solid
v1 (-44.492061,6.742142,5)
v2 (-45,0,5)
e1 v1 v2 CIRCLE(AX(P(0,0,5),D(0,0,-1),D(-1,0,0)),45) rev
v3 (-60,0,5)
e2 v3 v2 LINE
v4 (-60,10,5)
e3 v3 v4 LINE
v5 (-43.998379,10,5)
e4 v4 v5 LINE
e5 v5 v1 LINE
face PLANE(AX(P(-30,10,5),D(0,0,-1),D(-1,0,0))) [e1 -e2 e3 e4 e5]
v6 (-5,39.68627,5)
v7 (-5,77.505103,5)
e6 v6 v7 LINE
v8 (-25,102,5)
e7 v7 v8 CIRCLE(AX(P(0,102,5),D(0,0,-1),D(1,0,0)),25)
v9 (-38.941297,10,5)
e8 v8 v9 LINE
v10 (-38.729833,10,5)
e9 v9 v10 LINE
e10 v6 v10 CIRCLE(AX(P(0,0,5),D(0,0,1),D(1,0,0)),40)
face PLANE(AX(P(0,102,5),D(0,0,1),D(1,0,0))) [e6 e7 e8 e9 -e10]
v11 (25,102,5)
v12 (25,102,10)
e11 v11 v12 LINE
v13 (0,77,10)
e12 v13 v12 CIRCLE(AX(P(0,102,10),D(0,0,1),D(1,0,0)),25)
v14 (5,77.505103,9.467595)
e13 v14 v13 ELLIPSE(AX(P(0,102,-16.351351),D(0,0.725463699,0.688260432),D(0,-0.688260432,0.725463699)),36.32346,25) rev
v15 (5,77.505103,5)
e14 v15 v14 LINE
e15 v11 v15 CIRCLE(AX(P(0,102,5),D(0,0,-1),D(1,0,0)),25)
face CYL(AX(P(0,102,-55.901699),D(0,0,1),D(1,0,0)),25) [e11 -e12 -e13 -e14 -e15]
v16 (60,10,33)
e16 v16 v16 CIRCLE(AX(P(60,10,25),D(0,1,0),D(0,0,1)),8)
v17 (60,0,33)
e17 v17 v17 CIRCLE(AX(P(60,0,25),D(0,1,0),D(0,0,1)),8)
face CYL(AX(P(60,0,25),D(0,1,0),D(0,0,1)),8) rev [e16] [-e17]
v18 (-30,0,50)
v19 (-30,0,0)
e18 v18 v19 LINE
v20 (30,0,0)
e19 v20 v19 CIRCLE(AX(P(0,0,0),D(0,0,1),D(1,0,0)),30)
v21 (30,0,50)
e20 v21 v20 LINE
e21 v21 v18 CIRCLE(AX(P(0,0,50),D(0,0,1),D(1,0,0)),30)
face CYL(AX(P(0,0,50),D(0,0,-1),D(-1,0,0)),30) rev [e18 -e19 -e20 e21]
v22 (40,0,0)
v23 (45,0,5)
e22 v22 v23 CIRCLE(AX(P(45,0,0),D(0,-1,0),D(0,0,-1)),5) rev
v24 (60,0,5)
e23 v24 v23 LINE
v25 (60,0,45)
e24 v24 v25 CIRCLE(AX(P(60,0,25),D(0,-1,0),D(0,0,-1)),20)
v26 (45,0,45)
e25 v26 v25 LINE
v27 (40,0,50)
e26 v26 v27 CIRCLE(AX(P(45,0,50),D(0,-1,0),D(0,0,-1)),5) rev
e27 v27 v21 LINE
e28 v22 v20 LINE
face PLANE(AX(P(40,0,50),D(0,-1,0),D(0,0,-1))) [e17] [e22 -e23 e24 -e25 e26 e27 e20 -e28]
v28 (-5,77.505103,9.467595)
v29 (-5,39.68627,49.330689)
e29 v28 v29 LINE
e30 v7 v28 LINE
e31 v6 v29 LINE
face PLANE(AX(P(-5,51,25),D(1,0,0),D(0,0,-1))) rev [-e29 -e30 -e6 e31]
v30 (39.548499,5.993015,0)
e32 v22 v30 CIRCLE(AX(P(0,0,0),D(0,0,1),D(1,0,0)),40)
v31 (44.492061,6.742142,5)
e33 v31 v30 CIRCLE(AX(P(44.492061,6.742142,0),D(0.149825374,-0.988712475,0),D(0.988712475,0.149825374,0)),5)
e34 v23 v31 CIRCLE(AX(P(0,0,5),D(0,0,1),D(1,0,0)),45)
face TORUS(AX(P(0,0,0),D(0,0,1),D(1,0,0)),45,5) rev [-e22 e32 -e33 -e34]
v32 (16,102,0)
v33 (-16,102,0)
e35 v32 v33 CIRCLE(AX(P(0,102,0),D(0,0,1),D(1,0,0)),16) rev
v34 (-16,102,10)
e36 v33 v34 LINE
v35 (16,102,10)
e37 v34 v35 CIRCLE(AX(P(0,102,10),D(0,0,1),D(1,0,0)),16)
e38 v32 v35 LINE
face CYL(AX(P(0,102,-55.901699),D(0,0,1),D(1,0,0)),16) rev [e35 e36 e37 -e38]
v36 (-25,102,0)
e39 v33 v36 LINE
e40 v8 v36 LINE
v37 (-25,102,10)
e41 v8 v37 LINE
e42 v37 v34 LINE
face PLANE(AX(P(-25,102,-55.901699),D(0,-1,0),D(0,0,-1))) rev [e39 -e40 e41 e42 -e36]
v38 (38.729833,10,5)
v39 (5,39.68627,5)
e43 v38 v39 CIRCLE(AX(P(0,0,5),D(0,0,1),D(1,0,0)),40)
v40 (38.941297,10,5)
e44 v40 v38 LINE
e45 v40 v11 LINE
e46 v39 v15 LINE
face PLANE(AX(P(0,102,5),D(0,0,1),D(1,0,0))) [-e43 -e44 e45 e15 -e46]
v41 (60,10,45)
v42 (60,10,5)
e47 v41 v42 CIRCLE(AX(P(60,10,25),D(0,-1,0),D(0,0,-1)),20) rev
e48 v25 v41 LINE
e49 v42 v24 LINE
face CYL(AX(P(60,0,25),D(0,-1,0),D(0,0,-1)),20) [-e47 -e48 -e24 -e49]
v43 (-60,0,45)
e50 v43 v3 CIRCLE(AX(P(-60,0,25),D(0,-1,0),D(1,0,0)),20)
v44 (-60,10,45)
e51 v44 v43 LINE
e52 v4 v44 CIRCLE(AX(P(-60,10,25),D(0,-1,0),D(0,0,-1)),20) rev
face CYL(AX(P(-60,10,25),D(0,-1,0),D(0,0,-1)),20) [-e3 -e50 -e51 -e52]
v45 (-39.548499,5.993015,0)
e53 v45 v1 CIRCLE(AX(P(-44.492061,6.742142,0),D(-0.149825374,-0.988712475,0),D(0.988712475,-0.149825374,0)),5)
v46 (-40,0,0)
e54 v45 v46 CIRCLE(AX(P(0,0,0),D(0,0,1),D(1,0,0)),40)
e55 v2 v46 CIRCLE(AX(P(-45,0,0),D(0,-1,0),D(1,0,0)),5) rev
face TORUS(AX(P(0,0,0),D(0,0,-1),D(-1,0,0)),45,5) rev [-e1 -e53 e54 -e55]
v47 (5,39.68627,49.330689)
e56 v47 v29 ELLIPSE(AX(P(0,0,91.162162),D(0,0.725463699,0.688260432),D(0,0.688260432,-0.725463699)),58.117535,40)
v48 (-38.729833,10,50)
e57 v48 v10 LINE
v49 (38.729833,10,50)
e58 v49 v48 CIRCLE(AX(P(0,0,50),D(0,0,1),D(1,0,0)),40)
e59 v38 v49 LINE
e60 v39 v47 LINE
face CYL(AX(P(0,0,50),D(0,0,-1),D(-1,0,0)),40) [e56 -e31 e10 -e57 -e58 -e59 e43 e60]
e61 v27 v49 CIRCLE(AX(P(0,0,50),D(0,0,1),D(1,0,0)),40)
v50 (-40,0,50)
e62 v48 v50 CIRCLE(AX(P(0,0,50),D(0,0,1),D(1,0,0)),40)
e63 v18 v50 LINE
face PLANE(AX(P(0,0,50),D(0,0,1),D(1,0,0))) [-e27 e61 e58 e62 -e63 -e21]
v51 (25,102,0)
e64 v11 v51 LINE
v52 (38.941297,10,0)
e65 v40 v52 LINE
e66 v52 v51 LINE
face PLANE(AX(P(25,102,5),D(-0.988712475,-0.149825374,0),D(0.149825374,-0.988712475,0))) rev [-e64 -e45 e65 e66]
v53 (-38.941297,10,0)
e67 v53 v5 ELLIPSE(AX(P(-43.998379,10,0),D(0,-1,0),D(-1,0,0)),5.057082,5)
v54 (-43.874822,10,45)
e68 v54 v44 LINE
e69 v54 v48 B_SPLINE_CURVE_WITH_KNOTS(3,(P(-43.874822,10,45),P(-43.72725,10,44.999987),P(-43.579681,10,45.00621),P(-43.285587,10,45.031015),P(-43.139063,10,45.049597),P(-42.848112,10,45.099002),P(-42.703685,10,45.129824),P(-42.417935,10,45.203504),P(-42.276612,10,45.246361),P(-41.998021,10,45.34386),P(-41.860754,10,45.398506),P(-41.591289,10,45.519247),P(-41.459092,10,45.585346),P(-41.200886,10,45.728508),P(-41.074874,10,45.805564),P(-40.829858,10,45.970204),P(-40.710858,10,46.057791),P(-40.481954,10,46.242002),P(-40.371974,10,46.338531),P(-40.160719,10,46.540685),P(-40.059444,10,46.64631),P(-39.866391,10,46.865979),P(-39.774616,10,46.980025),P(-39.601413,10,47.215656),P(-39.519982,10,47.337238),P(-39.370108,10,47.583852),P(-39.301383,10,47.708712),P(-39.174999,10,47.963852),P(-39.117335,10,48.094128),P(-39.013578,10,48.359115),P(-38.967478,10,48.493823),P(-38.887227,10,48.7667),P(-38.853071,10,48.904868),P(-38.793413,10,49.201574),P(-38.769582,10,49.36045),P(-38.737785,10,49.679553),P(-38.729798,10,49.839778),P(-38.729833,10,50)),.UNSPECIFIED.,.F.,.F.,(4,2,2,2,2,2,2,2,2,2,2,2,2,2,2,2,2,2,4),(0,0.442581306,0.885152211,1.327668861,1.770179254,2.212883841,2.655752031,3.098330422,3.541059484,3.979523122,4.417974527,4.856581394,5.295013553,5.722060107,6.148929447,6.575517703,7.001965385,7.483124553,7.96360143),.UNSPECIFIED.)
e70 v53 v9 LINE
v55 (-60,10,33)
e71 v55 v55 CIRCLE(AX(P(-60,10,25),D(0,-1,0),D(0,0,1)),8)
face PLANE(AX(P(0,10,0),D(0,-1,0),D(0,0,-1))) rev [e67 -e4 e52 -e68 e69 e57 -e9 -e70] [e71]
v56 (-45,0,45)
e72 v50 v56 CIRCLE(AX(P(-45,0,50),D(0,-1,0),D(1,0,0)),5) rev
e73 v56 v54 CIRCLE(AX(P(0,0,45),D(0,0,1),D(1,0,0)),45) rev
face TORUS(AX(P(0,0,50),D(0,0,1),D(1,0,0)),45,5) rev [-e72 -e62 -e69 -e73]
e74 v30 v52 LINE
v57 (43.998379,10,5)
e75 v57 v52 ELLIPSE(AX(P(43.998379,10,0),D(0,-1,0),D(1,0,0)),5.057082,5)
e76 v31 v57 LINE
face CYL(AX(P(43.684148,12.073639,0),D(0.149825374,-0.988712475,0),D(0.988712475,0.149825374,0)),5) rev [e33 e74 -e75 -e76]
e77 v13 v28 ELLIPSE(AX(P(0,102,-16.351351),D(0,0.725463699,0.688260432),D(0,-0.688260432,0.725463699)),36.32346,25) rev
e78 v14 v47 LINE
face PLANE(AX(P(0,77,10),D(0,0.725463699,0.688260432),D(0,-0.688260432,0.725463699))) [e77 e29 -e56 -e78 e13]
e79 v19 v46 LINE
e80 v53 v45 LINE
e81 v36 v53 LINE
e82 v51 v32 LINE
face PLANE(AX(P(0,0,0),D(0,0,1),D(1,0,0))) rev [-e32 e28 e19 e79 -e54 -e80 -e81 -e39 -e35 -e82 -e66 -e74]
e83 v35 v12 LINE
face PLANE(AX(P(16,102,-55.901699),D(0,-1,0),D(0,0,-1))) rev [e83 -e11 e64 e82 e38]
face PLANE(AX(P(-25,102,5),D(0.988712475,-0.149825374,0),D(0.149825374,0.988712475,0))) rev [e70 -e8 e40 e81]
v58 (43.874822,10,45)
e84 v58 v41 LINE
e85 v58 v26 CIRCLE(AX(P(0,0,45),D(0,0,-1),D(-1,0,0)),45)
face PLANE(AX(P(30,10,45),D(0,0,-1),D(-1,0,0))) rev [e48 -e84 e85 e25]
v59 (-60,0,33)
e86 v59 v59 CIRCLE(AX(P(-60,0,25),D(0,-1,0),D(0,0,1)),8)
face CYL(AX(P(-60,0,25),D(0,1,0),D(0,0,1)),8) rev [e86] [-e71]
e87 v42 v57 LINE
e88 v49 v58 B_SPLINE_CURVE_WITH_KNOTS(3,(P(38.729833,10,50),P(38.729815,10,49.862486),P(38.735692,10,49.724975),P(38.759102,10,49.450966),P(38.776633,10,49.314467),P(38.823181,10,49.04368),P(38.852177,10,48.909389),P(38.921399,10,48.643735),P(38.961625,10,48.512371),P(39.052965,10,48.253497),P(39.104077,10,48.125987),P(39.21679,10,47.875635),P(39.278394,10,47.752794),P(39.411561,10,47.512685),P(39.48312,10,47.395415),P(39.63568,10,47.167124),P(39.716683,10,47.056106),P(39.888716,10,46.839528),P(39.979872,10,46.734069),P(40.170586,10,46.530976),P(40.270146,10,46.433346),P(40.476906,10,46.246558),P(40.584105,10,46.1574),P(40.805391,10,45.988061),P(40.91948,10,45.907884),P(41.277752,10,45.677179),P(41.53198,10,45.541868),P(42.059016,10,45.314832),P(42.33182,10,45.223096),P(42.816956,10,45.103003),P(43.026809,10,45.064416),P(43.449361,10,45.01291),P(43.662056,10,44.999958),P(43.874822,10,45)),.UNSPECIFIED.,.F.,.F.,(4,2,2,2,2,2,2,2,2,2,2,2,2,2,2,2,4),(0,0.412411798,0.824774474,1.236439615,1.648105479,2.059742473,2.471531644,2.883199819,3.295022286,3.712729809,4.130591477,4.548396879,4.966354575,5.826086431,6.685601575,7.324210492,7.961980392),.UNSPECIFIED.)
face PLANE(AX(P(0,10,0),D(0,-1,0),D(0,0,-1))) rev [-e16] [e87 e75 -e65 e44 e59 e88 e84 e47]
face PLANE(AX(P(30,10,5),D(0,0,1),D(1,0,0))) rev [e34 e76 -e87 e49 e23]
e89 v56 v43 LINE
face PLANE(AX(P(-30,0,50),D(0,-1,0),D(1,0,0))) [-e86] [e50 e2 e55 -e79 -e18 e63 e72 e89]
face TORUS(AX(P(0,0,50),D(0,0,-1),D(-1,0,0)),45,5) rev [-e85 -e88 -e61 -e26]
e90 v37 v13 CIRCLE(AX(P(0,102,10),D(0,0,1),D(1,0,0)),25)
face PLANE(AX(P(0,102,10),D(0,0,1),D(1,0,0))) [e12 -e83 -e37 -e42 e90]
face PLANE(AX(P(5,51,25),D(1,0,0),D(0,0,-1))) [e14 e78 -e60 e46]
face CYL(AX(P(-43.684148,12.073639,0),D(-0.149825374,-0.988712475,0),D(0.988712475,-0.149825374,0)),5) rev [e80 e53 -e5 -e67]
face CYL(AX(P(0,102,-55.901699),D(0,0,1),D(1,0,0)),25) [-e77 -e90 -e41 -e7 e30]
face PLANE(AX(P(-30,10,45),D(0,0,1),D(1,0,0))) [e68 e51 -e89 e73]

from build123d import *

# Parameters (mm, degrees)
EXTRUDE_THIN1_DEPTH         = 50
BOSS_EXTRUDE1_DEPTH         = 5
EXTRUDE_THIN3_DEPTH         = 5
EXTRUDE_THIN3_DEPTH_BACK    = 5
RIB6_REACH                  = 122.433
SKETCH4_WALL_W              = 296.6238277
SKETCH4_WALL_H              = 10
SKETCH5_W                   = 50
SKETCH5_H                   = 40
BOSS_EXTRUDE2_DEPTH         = 10
FILLET1_RADIUS              = 20
FILLET1_LENGTH              = 10
SKETCH6_R                   = 8
CUT_EXTRUDE1_DEPTH          = 132.77253128
FILLET2_R                   = 5
FILLET1_OF_MIRROR1_2_RADIUS = 20
FILLET1_OF_MIRROR1_2_LENGTH = 10
FILLET2_OF_MIRROR1_R        = 5


with BuildPart() as part:
    # Sketch1 → Extrude-Thin1 (new body)
    with BuildSketch(Plane.XY):
        with BuildLine():
            ThreePointArc((40, 0), (0, 40), (-40, 0))
            Line((-40, 0), (-30, 0))
            ThreePointArc((-30, 0), (0, 30), (30, 0))
            Line((30, 0), (40, 0))
        make_face()
    extrude(amount=EXTRUDE_THIN1_DEPTH)

    # Sketch2 → Boss-Extrude1 (add)
    with BuildSketch(Plane.XY):
        with BuildLine():
            Line((-30, 0), (-40, 0))
            ThreePointArc((-40, 0), (-39.886965034, 3.004999227), (-39.548498982, 5.993014955))
            Line((-39.548498982, 5.993014955), (-25, 102))
            ThreePointArc((-25, 102), (0, 77), (25, 102))
            Line((25, 102), (39.548498982, 5.993014955))
            ThreePointArc((39.548498982, 5.993014955), (39.886965034, 3.004999227), (40, 0))
            Line((40, 0), (30, 0))
            ThreePointArc((30, 0), (0, 30), (-30, 0))
        make_face()
    extrude(amount=BOSS_EXTRUDE1_DEPTH)

    # Sketch3 → Extrude-Thin3 (add, two sides: drawn at the far end of the back side and taken through both)
    with BuildSketch(Plane.XY.offset(5).offset(-EXTRUDE_THIN3_DEPTH_BACK)):
        with BuildLine():
            ThreePointArc((-25, 102), (0, 77), (25, 102))
            Line((25, 102), (16, 102))
            ThreePointArc((16, 102), (0, 86), (-16, 102))
            Line((-16, 102), (-25, 102))
        make_face()
    extrude(amount=EXTRUDE_THIN3_DEPTH + EXTRUDE_THIN3_DEPTH_BACK)

    # Sketch4 wall → Rib6 (add, up to next)
    with BuildSketch(Plane(origin=(0, 58.5, 29.5), x_dir=(0, -0.688260431919, 0.725463698509), z_dir=(0, -0.725463698509, -0.688260431919)), mode=Mode.PRIVATE) as rib6_sk1:
        Rectangle(SKETCH4_WALL_W, SKETCH4_WALL_H)
    rib6_tool1 = extrude(rib6_sk1.sketch, amount=RIB6_REACH, mode=Mode.PRIVATE) - part.part
    add(rib6_tool1.solids().sort_by_distance((0, 58.5, 29.5))[0])

    # Sketch5 → Boss-Extrude2 (add)
    with BuildSketch(Plane(origin=(0, 0, 0), x_dir=(1, 0, 0), z_dir=(0, 1, 0))):
        with Locations((55, -25)):
            Rectangle(SKETCH5_W, SKETCH5_H)
    boss_extrude2 = extrude(amount=BOSS_EXTRUDE2_DEPTH)

    # Fillet1: full round fillet: the end face becomes a half cylinder, R = half its width
    fillet1_face = Plane((80, 5, 25), x_dir=(0, 1, 0), z_dir=(1, 0, 0))  # on the end face: x along it, z out of the body
    fillet1_slab = fillet1_face.offset(-FILLET1_RADIUS / 2) * Box(FILLET1_LENGTH, 2 * FILLET1_RADIUS, FILLET1_RADIUS, mode=Mode.PRIVATE)  # the body's end, R deep
    fillet1_round = Plane((60, 5, 25), x_dir=(1, 0, 0), z_dir=(0, 1, 0)) * Cylinder(FILLET1_RADIUS, FILLET1_LENGTH, mode=Mode.PRIVATE)  # its axis R under the face
    add(fillet1_slab - fillet1_round, mode=Mode.SUBTRACT)

    # Sketch6 → Cut-Extrude1 (cut, through all)
    with BuildSketch(Plane(origin=(0, 10, 0), x_dir=(1, 0, 0), z_dir=(0, 1, 0))):
        with Locations(Location((60, -25, 0), (0, 0, 270))):
            Circle(SKETCH6_R)
    cut_extrude1 = extrude(amount=-CUT_EXTRUDE1_DEPTH, mode=Mode.SUBTRACT)

    # Fillet2
    fillet2_edges = [part.edges().sort_by_distance(p)[0] for p in [
        (39.244898063, 7.996507478, 5),
        (39.886965034, 3.004999227, 5),
        (39.681187851, 5.040171699, 45),
    ]]
    fillet(fillet2_edges, radius=FILLET2_R - 0.0001)  # a hair under: the kernel refuses the full size

    # Mirror1: Boss-Extrude2, Cut-Extrude1 across plane
    add(boss_extrude2.mirror(Plane(origin=(0, 0, 0), x_dir=(0, 0, 1), z_dir=(1, 0, 0))))
    add(cut_extrude1.mirror(Plane(origin=(0, 0, 0), x_dir=(0, 0, 1), z_dir=(1, 0, 0))), mode=Mode.SUBTRACT)

    # Fillet1 of Mirror1 2: full round fillet: the end face becomes a half cylinder, R = half its width
    fillet1_of_mirror1_2_face = Plane((-80, 5, 25), x_dir=(0, 1, 0), z_dir=(-1, 0, 0))  # on the end face: x along it, z out of the body
    fillet1_of_mirror1_2_slab = fillet1_of_mirror1_2_face.offset(-FILLET1_OF_MIRROR1_2_RADIUS / 2) * Box(FILLET1_OF_MIRROR1_2_LENGTH, 2 * FILLET1_OF_MIRROR1_2_RADIUS, FILLET1_OF_MIRROR1_2_RADIUS, mode=Mode.PRIVATE)  # the body's end, R deep
    fillet1_of_mirror1_2_round = Plane((-60, 5, 25), x_dir=(-1, 0, 0), z_dir=(0, 1, 0)) * Cylinder(FILLET1_OF_MIRROR1_2_RADIUS, FILLET1_OF_MIRROR1_2_LENGTH, mode=Mode.PRIVATE)  # its axis R under the face
    add(fillet1_of_mirror1_2_slab - fillet1_of_mirror1_2_round, mode=Mode.SUBTRACT)

    # Fillet2 of Mirror1
    fillet2_of_mirror1_edges = [part.edges().sort_by_distance(p)[0] for p in [
        (-39.244898063, 7.996507478, 5),
        (-39.886965034, 3.004999227, 5),
        (-39.681187851, 5.040171699, 45),
    ]]
    fillet(fillet2_of_mirror1_edges, radius=FILLET2_OF_MIRROR1_R - 0.0001)  # a hair under: the kernel refuses the full size


solid = part.part
